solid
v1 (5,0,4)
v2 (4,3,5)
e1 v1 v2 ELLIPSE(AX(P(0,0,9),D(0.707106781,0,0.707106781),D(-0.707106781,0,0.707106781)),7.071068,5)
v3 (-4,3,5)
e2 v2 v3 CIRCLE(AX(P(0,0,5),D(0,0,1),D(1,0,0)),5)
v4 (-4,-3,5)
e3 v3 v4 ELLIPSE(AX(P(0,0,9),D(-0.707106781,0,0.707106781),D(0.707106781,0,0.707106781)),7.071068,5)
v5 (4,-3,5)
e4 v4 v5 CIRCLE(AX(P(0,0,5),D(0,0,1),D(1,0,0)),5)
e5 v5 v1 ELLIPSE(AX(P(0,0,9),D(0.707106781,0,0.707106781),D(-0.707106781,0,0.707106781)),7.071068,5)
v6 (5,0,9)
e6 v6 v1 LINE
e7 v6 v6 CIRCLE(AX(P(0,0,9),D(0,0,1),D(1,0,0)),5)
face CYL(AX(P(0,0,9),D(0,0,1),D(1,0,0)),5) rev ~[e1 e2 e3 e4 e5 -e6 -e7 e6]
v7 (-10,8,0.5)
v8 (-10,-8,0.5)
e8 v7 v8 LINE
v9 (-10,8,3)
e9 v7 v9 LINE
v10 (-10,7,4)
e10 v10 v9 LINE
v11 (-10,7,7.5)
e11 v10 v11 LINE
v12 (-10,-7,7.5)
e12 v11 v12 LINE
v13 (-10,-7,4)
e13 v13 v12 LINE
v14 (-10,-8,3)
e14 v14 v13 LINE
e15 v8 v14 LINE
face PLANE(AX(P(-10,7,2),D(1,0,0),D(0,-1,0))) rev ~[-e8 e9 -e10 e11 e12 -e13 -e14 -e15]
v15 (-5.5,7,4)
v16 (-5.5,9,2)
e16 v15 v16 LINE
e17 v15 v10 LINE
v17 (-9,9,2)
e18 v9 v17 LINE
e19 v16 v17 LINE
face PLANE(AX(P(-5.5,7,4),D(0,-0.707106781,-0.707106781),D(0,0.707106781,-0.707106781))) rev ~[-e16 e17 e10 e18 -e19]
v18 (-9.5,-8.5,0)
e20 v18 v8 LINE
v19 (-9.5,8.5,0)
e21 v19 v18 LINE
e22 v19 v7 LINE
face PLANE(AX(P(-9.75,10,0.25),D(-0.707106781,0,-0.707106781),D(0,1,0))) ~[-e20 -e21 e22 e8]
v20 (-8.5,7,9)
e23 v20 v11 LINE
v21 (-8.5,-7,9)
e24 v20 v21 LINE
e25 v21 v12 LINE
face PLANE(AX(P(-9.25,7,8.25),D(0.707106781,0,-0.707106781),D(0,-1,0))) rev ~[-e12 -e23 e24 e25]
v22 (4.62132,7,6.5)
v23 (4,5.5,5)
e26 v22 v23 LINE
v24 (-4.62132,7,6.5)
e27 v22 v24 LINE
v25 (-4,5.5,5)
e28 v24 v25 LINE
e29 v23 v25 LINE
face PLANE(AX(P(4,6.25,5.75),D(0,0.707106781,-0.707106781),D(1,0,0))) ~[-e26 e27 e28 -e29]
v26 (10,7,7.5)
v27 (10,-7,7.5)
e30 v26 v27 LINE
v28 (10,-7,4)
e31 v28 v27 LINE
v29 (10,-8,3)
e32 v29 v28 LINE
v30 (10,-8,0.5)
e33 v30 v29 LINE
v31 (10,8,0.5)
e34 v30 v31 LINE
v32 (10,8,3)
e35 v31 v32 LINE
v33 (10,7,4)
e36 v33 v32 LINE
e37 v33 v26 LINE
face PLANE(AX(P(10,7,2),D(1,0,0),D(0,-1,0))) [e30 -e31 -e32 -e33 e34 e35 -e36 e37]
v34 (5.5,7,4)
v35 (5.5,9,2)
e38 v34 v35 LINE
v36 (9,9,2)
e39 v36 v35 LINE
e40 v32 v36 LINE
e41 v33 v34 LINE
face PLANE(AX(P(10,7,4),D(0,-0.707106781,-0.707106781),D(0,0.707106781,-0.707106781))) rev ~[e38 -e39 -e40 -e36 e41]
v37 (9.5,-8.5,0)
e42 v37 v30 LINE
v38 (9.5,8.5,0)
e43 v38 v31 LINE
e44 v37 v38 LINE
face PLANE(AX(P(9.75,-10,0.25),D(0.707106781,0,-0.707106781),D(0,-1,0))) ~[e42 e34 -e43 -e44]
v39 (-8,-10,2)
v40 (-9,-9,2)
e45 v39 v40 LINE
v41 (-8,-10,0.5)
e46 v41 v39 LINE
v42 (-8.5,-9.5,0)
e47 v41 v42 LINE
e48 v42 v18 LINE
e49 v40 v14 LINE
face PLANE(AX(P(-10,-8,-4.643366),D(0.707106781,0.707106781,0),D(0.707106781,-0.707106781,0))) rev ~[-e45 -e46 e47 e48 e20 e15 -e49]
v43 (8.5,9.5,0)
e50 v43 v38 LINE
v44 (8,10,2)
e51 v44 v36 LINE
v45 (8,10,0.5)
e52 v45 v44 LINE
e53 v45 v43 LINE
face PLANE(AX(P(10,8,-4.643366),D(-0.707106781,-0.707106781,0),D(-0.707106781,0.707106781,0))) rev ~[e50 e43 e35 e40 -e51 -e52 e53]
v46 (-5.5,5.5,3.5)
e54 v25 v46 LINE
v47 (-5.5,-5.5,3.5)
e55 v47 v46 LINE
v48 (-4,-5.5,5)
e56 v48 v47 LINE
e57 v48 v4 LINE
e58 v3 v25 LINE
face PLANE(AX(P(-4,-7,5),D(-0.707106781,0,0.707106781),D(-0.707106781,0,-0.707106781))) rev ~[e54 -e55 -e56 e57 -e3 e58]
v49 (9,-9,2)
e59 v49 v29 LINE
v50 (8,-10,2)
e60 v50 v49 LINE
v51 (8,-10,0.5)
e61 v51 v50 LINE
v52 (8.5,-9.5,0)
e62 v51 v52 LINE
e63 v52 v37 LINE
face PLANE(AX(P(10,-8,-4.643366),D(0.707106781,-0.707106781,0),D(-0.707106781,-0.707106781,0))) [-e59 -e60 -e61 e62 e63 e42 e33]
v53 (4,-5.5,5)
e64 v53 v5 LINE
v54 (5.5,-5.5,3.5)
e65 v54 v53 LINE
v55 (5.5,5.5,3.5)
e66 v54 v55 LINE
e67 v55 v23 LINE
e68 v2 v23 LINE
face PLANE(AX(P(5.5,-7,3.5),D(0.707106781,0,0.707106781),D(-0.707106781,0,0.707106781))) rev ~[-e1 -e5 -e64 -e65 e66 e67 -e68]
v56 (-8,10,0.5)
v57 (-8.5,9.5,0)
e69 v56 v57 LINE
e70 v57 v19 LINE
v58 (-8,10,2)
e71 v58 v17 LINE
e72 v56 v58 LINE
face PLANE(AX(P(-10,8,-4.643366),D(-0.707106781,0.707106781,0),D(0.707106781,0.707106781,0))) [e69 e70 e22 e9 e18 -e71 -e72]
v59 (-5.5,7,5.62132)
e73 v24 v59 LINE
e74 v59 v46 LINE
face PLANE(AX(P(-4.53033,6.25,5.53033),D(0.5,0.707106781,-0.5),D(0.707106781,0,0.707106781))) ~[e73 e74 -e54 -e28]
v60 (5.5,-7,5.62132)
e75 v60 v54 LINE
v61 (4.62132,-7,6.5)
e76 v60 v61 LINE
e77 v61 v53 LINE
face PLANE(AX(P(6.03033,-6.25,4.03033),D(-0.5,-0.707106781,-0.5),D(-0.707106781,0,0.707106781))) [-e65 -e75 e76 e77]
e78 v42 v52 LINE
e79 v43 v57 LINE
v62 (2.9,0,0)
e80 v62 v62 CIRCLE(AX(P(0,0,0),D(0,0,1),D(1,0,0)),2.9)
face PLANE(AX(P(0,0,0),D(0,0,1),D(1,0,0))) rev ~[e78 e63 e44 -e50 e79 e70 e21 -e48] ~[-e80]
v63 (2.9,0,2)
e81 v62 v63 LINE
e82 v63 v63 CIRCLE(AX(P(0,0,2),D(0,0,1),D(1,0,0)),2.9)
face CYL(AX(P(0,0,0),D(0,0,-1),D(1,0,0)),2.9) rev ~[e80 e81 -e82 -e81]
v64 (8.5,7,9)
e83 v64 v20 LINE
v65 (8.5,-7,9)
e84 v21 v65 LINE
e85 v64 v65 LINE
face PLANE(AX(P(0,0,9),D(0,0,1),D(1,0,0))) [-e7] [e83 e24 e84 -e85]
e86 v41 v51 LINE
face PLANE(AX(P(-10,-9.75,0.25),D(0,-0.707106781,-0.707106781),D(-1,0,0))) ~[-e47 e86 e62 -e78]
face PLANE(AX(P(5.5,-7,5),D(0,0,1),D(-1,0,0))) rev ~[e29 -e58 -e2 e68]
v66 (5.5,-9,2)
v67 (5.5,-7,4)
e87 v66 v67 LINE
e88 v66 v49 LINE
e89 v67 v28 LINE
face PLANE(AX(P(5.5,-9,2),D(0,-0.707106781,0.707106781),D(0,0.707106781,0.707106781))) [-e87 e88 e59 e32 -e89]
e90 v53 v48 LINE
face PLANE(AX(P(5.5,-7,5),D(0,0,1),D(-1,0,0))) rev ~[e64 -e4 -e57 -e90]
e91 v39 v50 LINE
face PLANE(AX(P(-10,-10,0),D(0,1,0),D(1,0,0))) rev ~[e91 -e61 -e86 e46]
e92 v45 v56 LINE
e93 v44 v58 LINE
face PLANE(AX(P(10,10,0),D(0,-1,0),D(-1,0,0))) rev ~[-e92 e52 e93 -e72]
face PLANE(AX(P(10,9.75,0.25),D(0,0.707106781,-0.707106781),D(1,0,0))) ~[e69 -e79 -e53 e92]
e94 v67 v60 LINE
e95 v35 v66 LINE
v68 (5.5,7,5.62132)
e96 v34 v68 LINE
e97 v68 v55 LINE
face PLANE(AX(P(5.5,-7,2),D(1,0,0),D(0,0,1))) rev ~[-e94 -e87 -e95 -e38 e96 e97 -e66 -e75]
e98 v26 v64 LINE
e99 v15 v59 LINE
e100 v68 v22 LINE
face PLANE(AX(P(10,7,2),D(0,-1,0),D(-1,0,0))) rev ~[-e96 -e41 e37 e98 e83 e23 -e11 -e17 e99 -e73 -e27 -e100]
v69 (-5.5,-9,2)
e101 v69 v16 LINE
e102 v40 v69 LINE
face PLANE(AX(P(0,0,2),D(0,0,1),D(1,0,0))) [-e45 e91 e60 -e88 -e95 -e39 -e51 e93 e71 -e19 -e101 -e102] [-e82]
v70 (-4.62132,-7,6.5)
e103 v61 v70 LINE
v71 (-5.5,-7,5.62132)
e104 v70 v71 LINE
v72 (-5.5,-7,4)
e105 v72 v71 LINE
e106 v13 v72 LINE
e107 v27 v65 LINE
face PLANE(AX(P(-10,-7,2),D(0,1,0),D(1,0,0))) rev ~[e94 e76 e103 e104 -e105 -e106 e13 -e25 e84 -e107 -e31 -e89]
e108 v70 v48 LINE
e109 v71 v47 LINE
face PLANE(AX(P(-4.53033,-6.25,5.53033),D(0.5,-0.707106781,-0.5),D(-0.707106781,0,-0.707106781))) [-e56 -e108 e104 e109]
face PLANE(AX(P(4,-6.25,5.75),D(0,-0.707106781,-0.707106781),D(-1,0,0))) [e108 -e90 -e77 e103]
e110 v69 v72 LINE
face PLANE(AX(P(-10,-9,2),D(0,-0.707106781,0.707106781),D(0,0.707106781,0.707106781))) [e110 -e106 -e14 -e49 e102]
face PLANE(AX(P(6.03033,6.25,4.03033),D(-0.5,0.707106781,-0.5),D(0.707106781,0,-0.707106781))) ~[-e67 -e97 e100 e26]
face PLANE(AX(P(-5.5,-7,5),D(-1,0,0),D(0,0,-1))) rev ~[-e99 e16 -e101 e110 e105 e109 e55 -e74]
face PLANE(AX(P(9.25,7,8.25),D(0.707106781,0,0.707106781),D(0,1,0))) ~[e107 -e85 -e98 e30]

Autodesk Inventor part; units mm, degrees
ref_plane "YZ Plane" through (0, 0, 0) normal (1, 0, 0) x (0, 1, 0)
ref_plane "XZ Plane" through (0, 0, 0) normal (0, 1, 0) x (-1, 0, 0)
ref_plane "XY Plane" through (0, 0, 0) normal (0, 0, 1) x (1, 0, 0)
sketch "Sketch1" plane through (0, 0, 0) normal (0, 0, 1) x (1, 0, 0)
  line L0 (-10, -10) -> (10, -10)
  line L1 (10, -10) -> (10, 10)
  line L2 (10, 10) -> (-10, 10)
  line L3 (-10, 10) -> (-10, -10)
  line L4 (-10, -10) -> (10, 10) construction
  line L5 (10, -10) -> (-10, 10) construction
  circle A0 centre (0, 0) radius 2.9
  dimension "d0" = 20
  dimension "d1" = 20
  dimension "d2" = 5.8
extrude "Extrusion1" add sketch "Sketch1" along normal blind 2
chamfer "Chamfer1" distance 0.5 angle 45 4 edges at (10, 0, 0) (0, 10, 0) (-10, 0, 0) (0, -10, 0)
sketch "Sketch2" plane through (0, 0, 2) normal (0, 0, 1) x (1, 0, 0)
  line L0 (10, 10) -> (10, -10) projected
  line L1 (-10, -7) -> (10, -7)
  line L2 (10, -7) -> (10, 7)
  line L3 (10, 7) -> (-10, 7)
  line L4 (-10, 7) -> (-10, -7)
  line L5 (-10, -7) -> (10, 7) construction
  line L6 (10, -7) -> (-10, 7) construction
  point P0 (0, 0)
  dimension "d8" = 14
extrude "Extrusion2" add sketch "Sketch2" along normal blind 7
sketch "Sketch5" plane through (-10, -7, 2) normal (0, -1, 0) x (1, 0, 0)
  line L0 (20, 0) -> (0, 0) projected
  line L1 (4.5, 0) -> (15.5, 0)
  line L2 (15.5, 0) -> (15.5, 3)
  line L3 (15.5, 3) -> (4.5, 3)
  line L4 (4.5, 3) -> (4.5, 0)
  line L5 (0, 0) -> (0, 7) projected
  line L6 (20, 0) -> (20, 7) projected
  point P0 (10, -2)
  dimension "d18" = 3
  dimension "d19" = 4.5
  dimension "d20" = 4.5
extrude "Extrusion4" cut sketch "Sketch5" against normal through all
sketch "Sketch6" plane through (0, 0, 9) normal (0, 0, 1) x (1, 0, 0)
  circle A0 centre (0, 0) radius 2.9 construction
  circle A1 centre (0, 0) radius 5
  dimension "d23" = 10
extrude "Extrusion5" cut sketch "Sketch6" against normal up to surface (7 mm away)
chamfer "Chamfer4" distance 1.5 angle 45 2 edges at (-5.5, 0, 5) (5.5, 0, 5)
chamfer "Chamfer5" distance 1.5 angle 45 6 edges at (0, -7, 5) (0, 7, 5) (-4.75, -7, 4.25) (4.75, -7, 4.25) (4.75, 7, 4.25) (-4.75, 7, 4.25)
chamfer "Chamfer6" distance 1.5 angle 45 2 edges at (-10, 0, 9) (10, 0, 9)
chamfer "Chamfer7" distance 2 angle 45 8 edges at (10, 10, 1.25) (-10, 10, 1.25) (-10, -10, 1.25) (10, -10, 1.25) (7.75, -7, 2) (-7.75, -7, 2) (-7.75, 7, 2) (7.75, 7, 2)
equation "\"d20\" = d19"
properties part number "_3DPrint"
